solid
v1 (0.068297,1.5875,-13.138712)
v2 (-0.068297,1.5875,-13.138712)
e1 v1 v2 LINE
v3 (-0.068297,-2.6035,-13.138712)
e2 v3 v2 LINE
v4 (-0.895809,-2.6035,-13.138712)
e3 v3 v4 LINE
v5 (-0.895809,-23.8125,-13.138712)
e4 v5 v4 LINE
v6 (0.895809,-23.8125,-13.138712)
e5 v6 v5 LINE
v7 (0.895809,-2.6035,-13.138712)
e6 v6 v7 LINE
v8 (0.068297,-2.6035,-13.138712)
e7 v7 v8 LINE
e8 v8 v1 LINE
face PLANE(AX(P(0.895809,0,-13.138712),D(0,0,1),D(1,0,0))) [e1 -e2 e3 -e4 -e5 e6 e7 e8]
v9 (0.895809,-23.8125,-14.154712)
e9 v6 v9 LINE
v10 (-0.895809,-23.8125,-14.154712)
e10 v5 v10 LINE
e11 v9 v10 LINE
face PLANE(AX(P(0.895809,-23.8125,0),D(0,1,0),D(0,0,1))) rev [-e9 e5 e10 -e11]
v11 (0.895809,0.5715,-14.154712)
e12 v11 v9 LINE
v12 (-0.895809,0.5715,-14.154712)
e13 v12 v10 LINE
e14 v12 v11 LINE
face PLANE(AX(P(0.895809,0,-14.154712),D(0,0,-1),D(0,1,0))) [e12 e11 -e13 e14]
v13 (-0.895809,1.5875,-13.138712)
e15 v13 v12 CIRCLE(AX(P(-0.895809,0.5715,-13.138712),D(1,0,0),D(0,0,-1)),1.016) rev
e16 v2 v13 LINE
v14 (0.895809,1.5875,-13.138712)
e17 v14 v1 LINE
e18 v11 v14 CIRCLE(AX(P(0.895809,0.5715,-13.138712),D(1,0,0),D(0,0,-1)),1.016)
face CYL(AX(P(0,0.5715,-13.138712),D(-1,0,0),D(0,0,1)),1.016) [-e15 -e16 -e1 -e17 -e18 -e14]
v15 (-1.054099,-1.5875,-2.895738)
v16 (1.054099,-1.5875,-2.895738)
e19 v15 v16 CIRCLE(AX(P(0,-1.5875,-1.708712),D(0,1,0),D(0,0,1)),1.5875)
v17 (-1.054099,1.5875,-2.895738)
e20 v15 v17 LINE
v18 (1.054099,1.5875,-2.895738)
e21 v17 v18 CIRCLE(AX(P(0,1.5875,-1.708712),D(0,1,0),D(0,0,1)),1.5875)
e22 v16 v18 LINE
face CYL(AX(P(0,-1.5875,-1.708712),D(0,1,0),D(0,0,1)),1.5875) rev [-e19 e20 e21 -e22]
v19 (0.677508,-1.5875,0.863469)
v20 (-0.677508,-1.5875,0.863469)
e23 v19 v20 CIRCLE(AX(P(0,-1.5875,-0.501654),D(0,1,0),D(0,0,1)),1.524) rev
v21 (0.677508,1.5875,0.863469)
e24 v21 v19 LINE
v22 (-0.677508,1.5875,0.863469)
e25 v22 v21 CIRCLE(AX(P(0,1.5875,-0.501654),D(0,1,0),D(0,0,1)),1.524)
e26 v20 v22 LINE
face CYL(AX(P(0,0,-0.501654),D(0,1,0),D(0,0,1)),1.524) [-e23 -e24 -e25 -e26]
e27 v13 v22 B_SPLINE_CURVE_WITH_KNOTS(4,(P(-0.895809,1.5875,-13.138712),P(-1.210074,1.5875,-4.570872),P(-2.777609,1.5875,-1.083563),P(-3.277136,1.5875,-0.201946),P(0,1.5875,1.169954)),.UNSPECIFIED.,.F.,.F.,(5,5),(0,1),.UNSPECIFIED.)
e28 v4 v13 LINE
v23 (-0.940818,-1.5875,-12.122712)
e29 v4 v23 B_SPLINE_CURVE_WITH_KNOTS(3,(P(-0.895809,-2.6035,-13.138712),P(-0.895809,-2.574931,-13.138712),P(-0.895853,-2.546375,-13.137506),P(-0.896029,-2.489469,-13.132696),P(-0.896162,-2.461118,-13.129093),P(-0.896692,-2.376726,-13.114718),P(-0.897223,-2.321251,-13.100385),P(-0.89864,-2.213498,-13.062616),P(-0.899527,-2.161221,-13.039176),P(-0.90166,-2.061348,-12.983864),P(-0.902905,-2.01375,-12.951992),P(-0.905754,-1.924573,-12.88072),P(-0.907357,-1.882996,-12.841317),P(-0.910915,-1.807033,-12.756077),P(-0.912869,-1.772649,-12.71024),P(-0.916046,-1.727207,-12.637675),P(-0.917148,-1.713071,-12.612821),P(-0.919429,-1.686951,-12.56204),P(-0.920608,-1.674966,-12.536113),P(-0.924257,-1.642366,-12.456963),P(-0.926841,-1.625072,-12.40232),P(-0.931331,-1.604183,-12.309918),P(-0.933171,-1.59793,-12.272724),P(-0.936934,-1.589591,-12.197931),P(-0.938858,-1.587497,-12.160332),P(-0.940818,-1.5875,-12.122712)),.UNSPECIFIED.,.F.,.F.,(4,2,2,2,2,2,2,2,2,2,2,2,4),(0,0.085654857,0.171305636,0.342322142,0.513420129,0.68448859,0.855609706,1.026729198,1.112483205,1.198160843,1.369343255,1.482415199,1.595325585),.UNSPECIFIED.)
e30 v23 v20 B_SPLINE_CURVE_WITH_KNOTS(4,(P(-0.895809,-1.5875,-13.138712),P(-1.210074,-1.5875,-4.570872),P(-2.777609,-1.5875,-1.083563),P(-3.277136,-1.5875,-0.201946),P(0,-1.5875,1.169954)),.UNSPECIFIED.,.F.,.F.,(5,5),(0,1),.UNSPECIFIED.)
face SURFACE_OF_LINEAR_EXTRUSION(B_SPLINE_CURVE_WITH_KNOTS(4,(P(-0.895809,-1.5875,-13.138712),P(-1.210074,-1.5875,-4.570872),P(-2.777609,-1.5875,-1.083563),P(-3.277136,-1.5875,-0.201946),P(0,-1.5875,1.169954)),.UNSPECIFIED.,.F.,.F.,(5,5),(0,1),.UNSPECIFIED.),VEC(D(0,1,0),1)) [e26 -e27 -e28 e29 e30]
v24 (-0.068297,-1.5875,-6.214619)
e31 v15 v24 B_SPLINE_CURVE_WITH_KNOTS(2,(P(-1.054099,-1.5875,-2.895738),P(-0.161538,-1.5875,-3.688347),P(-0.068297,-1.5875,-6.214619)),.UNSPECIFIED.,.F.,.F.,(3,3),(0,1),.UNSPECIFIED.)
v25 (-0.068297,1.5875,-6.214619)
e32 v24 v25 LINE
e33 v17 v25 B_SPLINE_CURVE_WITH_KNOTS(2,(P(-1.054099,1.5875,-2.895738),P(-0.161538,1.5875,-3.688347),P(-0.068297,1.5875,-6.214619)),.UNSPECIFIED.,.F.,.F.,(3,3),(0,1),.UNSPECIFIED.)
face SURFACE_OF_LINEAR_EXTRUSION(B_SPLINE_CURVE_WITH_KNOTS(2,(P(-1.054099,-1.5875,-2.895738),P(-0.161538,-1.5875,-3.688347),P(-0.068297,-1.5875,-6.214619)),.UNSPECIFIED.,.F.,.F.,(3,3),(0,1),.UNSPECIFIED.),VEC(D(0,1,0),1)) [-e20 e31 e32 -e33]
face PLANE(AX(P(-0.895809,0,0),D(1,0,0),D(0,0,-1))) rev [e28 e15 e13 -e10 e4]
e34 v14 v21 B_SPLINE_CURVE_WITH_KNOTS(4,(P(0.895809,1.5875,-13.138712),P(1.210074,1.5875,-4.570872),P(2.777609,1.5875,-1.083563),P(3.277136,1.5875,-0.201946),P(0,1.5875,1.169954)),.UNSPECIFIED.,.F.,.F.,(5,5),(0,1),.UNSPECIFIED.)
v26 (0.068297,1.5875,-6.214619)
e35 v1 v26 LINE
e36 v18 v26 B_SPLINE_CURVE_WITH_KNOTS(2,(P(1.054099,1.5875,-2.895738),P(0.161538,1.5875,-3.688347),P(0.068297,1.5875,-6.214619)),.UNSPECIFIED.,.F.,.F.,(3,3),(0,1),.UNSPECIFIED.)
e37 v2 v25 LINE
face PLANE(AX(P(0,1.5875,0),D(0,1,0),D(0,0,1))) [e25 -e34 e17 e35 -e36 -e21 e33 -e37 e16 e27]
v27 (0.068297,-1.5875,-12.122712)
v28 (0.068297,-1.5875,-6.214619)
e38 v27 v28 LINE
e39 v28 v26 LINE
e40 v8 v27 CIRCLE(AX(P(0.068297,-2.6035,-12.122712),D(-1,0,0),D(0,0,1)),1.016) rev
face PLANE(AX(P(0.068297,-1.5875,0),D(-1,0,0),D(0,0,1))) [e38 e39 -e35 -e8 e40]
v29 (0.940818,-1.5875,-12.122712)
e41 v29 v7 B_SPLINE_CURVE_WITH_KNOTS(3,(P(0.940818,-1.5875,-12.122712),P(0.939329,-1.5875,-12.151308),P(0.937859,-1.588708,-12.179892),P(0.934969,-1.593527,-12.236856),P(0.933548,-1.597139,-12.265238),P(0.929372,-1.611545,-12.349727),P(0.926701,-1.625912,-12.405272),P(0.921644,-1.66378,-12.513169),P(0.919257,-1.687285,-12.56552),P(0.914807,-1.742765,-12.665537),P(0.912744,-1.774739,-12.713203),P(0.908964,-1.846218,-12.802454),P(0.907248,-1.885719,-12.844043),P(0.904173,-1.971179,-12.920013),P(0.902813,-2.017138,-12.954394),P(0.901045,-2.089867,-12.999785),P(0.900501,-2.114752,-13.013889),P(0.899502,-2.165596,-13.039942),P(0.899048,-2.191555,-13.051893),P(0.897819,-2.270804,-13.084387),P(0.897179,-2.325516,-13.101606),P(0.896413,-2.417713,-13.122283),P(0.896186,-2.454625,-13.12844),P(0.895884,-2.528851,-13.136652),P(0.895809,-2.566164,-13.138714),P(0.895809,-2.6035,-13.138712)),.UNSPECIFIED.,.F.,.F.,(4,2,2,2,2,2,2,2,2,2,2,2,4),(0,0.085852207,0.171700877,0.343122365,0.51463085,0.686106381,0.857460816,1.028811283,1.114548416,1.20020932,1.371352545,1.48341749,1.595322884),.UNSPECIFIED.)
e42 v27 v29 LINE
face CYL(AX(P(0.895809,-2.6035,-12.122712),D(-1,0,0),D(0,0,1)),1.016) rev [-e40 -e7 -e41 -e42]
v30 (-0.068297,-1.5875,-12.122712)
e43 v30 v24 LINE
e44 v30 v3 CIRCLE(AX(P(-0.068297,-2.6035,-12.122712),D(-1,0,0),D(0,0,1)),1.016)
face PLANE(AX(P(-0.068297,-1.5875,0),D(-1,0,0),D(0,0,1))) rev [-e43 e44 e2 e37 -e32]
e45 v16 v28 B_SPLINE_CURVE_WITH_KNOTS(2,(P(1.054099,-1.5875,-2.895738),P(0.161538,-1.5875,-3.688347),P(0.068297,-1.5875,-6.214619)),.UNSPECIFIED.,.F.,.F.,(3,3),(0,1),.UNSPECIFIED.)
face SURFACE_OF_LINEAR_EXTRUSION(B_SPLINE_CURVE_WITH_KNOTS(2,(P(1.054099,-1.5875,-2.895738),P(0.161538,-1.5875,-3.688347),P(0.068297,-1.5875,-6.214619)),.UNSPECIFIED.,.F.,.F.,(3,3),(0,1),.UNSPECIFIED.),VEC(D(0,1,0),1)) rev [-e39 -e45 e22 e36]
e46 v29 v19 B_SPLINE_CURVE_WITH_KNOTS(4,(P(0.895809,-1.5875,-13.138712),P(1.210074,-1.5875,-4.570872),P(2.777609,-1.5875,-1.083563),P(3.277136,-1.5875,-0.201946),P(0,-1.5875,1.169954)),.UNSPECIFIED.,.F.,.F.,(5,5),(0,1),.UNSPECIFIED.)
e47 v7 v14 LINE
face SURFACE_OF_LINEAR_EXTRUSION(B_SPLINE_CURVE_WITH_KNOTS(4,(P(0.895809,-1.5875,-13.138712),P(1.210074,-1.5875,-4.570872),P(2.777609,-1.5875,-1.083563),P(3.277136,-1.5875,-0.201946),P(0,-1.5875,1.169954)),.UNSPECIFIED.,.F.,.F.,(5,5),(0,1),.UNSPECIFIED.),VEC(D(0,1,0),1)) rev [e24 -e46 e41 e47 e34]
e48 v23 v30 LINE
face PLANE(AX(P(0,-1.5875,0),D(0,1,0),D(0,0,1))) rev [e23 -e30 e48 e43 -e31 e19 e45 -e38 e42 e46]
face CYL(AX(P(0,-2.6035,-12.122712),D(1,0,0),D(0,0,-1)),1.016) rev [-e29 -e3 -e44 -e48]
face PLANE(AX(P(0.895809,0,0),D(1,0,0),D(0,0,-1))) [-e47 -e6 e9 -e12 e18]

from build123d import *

# Parameters (mm, degrees)
BOSS_EXTRUDE1_DEPTH      = 1.5875
BOSS_EXTRUDE1_DEPTH_BACK = 1.5875
FILLET1_R                = 1.524
BOSS_EXTRUDE2_DEPTH      = 0.89581
BOSS_EXTRUDE2_DEPTH_BACK = 0.89581
FILLET2_R                = 1.016


with BuildPart() as part:
    # Sketch1 → Boss-Extrude1 (new, two sides: drawn at the far end of the back side and taken through both)
    with BuildSketch(Plane(origin=(0, 0, 0), x_dir=(1, 0, 0), z_dir=(0, 1, 0)).offset(-BOSS_EXTRUDE1_DEPTH_BACK)):
        with BuildLine():
            Line((-0.068296764, 6.214618695), (-0.068296764, 13.138711739))
            Line((-0.068296764, 13.138711739), (-0.895808533, 13.138711739))
            add(Edge.make_bspline(
                [(-0.895808533, 13.138711739), (-1.210074473, 4.57087153), (-2.777608758, 1.083562638), (-3.277136157, 0.201945645), (0, -1.169953638)],
                knots=[0, 0, 0, 0, 0, 1, 1, 1, 1, 1], degree=4))
            add(Edge.make_bspline(
                [(0.895808533, 13.138711739), (1.210074473, 4.57087153), (2.777608758, 1.083562638), (3.277136157, 0.201945645), (0, -1.169953638)],
                knots=[0, 0, 0, 0, 0, 1, 1, 1, 1, 1], degree=4))
            Line((0.895808533, 13.138711739), (0.068296764, 13.138711739))
            Line((0.068296764, 13.138711739), (0.068296764, 6.214618695))
            add(Edge.make_bspline(
                [(1.054098961, 2.89573812), (0.161537854, 3.688347072), (0.068296764, 6.214618695)],
                knots=[0, 0, 0, 1, 1, 1], degree=2))
            ThreePointArc((1.054098961, 2.89573812), (0, 0.121211739), (-1.054098961, 2.89573812))
            add(Edge.make_bspline(
                [(-1.054098961, 2.89573812), (-0.161537854, 3.688347072), (-0.068296764, 6.214618695)],
                knots=[0, 0, 0, 1, 1, 1], degree=2))
        make_face()
    extrude(amount=BOSS_EXTRUDE1_DEPTH + BOSS_EXTRUDE1_DEPTH_BACK)

    # Fillet1
    fillet1_edges = [part.edges().sort_by_distance(p)[0] for p in [
        (0, -0.79375, 1.169953638),
    ]]
    fillet(fillet1_edges, radius=FILLET1_R)

    # Sketch2 → Boss-Extrude2 (add, two sides: drawn at the far end of the back side and taken through both)
    with BuildSketch(Plane(origin=(0, 0, 0), x_dir=(0, 0, -1), z_dir=(1, 0, 0)).offset(-BOSS_EXTRUDE2_DEPTH_BACK)):
        Polygon((13.138711739, 1.5875), (13.138711739, -1.5875), (13.138711739, -23.8125), (14.154711739, -23.8125), (14.154711739, 1.5875), align=None)
    extrude(amount=BOSS_EXTRUDE2_DEPTH + BOSS_EXTRUDE2_DEPTH_BACK)

    # Fillet2
    fillet2_edges = [part.edges().sort_by_distance(p)[0] for p in [
        (0, 1.5875, -14.154711739),
        (0.482052648, -1.5875, -13.138711739),
        (-0.482052648, -1.5875, -13.138711739),
    ]]
    fillet(fillet2_edges, radius=FILLET2_R - 0.0001)  # a hair under: the kernel refuses the full size


solid = part.part
